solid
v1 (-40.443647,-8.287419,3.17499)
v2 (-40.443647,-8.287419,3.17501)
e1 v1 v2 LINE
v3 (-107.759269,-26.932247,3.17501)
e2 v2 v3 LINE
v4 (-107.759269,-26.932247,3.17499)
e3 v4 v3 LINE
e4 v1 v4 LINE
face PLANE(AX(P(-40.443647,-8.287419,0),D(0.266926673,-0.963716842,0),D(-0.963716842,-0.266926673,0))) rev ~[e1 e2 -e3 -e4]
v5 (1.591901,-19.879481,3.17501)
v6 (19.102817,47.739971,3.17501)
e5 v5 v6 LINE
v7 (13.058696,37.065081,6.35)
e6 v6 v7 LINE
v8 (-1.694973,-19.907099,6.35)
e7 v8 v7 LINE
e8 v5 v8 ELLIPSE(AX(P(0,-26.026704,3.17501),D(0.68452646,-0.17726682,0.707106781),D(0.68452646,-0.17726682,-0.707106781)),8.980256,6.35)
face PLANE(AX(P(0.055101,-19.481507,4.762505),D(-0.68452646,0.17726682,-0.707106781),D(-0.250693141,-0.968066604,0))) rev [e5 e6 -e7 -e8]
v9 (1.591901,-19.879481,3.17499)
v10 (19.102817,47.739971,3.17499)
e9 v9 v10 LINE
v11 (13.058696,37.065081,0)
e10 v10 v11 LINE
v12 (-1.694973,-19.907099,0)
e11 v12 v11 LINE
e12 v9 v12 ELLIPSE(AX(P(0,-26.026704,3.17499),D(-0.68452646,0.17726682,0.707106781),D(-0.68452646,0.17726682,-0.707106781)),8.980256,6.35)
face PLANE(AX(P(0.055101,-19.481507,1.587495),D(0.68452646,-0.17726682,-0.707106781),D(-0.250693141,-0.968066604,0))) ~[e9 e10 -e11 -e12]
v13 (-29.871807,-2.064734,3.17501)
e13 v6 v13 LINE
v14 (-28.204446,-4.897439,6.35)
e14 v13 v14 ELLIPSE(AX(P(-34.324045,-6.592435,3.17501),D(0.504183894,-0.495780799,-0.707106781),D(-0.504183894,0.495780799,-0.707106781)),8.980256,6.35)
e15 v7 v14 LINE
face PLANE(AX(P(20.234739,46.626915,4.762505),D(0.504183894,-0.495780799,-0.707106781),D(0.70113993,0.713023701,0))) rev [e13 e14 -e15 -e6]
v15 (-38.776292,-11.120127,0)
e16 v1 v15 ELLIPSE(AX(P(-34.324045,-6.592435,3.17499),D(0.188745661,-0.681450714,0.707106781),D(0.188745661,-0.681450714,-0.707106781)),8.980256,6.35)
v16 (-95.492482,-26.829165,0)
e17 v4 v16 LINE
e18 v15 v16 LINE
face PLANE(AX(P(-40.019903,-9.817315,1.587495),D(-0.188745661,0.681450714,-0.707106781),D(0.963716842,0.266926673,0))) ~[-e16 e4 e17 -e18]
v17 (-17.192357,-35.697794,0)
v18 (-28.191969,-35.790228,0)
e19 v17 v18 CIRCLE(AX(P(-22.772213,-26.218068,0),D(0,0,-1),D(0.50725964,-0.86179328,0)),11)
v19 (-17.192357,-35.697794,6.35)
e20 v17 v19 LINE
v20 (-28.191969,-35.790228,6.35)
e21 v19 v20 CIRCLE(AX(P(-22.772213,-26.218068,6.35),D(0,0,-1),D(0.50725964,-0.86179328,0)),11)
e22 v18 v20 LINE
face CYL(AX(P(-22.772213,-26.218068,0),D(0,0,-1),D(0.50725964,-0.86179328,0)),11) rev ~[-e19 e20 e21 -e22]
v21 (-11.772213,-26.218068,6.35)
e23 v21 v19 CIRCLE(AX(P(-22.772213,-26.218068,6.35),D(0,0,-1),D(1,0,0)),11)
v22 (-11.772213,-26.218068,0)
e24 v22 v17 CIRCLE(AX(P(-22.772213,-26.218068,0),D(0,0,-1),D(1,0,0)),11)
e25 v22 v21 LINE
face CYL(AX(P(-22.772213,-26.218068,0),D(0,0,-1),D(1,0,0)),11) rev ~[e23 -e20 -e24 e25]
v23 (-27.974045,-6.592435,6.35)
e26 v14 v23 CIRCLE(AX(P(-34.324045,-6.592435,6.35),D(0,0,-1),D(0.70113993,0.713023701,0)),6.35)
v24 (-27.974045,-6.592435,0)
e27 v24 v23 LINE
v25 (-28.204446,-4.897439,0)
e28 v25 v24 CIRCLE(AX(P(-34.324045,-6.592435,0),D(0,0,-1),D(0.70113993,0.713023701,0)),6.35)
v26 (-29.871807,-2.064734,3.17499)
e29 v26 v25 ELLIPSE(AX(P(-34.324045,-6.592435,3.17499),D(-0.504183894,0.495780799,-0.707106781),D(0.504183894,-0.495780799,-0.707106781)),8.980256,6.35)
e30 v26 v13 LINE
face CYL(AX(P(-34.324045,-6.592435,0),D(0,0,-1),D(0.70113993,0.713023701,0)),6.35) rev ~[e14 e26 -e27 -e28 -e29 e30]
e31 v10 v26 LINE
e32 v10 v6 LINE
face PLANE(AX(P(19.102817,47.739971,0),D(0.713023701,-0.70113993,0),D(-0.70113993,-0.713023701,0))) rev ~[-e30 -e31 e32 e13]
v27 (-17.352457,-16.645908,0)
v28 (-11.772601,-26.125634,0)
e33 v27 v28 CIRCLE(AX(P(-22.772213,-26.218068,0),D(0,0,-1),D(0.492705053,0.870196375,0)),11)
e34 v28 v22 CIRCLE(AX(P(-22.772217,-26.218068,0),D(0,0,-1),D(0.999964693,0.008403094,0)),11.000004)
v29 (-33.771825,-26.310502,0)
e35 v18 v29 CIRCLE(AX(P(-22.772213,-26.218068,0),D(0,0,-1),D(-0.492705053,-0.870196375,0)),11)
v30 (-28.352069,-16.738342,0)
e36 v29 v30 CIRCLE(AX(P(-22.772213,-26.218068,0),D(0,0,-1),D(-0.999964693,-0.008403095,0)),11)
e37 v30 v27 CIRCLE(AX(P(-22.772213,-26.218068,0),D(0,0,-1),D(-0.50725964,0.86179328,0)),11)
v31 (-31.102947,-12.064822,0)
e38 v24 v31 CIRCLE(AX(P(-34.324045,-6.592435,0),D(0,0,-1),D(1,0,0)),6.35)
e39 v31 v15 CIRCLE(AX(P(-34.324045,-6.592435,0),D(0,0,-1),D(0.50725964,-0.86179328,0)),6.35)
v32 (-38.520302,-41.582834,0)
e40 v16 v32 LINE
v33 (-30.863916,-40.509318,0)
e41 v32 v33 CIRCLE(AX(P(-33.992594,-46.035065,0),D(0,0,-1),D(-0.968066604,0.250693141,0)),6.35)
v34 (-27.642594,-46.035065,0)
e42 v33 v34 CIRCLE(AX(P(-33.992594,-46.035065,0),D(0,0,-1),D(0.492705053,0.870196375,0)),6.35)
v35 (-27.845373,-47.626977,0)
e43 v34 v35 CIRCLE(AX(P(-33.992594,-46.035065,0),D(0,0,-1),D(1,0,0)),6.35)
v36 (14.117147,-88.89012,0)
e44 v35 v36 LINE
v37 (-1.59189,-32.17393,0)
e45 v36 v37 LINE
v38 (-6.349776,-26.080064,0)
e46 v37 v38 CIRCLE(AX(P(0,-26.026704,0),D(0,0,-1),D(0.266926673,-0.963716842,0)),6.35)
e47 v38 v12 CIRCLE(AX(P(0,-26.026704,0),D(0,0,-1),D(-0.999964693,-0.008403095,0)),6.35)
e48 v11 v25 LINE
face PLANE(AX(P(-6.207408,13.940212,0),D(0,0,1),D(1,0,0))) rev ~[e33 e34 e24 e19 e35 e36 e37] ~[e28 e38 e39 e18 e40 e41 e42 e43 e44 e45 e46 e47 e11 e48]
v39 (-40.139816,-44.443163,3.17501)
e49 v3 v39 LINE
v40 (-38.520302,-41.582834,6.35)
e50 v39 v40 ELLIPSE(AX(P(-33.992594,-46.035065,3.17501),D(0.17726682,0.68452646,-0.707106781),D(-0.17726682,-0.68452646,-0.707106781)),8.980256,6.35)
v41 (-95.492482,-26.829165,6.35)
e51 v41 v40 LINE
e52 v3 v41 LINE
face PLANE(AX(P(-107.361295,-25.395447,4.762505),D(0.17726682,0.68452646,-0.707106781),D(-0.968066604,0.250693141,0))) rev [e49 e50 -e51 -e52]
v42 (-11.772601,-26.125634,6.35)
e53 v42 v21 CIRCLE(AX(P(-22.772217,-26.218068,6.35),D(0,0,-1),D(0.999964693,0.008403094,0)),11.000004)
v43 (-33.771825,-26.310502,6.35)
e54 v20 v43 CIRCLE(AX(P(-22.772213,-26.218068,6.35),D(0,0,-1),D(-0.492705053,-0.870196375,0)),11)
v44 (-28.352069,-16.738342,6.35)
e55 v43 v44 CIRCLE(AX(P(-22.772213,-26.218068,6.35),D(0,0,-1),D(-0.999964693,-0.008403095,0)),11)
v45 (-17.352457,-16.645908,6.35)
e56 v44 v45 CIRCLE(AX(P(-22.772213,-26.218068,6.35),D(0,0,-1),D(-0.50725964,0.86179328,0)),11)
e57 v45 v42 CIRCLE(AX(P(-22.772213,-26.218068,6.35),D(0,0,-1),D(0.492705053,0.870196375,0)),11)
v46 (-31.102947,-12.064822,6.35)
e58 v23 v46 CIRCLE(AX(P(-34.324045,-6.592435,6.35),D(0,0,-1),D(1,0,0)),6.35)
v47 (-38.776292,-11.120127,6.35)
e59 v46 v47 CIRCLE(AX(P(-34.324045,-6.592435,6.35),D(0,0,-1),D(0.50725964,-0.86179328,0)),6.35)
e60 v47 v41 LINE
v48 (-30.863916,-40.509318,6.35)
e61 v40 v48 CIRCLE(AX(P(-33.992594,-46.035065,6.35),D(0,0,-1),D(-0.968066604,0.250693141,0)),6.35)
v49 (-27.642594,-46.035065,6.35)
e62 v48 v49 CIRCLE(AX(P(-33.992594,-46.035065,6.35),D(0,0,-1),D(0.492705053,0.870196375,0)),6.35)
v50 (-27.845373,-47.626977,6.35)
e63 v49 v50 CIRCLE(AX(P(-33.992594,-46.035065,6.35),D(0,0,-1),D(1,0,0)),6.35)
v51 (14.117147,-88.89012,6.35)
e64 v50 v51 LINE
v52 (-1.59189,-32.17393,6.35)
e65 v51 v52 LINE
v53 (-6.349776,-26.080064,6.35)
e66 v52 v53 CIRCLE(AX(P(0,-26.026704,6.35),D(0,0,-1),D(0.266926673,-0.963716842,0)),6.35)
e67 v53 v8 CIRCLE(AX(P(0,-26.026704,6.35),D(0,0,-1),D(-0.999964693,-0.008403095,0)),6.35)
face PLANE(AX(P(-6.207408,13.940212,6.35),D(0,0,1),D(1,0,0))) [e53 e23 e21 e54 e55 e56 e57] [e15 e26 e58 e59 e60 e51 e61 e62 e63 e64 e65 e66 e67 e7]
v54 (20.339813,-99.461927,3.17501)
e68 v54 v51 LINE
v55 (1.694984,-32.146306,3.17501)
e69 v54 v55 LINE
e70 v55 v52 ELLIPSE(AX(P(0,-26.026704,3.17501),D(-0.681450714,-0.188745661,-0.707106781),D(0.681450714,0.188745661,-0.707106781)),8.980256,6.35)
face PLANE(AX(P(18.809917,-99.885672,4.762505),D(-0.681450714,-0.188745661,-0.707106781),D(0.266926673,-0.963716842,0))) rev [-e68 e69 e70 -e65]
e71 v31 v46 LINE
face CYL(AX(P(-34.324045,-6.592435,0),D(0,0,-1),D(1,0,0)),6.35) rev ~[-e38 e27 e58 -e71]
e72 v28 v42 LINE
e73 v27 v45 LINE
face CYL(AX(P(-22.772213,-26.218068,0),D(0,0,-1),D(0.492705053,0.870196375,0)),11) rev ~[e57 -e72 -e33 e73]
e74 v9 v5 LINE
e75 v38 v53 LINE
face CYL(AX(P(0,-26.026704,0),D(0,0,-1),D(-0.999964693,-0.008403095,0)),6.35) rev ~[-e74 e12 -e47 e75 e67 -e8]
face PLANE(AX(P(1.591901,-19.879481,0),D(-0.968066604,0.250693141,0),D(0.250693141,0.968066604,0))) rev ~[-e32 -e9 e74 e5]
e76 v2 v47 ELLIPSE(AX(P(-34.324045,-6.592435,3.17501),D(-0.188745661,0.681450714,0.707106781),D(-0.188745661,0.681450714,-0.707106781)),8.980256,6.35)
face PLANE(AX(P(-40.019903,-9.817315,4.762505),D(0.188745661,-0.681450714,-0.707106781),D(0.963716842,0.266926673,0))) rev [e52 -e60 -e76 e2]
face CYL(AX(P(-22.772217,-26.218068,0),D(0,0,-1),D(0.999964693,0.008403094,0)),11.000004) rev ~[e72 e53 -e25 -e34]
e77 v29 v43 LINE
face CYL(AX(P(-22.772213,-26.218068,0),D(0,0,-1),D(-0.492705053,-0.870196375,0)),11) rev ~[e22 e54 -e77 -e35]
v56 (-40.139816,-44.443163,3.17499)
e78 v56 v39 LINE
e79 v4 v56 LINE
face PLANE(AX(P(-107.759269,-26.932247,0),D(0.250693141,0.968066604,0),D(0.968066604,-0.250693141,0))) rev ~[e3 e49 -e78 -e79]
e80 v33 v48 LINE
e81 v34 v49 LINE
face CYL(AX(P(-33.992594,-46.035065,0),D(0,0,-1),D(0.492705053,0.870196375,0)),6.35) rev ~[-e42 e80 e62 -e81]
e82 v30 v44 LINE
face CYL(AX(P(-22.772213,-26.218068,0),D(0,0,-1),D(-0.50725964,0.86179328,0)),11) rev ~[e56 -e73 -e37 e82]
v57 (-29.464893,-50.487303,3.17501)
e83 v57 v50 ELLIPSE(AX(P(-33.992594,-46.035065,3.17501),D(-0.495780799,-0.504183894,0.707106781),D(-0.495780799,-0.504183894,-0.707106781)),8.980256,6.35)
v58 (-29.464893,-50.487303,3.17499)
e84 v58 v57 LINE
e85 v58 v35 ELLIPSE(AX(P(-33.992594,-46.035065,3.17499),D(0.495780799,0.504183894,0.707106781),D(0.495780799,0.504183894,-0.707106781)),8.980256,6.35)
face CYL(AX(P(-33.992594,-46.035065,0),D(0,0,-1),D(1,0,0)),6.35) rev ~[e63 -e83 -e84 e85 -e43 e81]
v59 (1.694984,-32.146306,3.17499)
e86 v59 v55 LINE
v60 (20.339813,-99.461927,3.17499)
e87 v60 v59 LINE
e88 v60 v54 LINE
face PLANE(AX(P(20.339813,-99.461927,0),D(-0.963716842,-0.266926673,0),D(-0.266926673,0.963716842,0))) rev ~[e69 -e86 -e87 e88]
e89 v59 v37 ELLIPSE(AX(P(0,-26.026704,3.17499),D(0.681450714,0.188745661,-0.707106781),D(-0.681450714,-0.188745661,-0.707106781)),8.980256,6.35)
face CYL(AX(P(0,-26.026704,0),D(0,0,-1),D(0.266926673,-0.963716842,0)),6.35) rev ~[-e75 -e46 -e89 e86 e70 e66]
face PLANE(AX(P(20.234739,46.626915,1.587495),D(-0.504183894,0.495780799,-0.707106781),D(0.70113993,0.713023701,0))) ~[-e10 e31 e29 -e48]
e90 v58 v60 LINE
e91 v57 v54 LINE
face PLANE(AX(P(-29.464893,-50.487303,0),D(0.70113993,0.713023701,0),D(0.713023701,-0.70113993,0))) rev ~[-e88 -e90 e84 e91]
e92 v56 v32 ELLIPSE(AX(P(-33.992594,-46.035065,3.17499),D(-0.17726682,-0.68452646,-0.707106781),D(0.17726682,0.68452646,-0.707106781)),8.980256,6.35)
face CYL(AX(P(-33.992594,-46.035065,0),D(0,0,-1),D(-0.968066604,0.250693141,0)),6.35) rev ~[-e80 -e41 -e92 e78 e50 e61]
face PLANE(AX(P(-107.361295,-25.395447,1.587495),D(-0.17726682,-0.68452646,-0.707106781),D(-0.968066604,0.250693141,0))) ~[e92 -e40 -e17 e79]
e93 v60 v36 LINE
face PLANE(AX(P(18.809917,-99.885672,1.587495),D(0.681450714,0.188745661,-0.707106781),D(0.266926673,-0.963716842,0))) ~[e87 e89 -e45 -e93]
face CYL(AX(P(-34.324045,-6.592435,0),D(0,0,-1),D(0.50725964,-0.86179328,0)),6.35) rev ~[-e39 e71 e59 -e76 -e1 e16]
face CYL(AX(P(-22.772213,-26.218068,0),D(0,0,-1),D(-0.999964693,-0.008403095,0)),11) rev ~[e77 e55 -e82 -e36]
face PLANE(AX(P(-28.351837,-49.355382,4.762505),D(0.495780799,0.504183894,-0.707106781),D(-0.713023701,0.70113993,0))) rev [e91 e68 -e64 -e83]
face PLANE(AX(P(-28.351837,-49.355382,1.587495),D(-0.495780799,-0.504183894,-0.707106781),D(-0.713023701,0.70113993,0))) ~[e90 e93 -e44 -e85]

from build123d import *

# Parameters (mm, degrees)
F1_DEPTH = 6.35
F2_SIZE  = 3.17499


# Not quite as in the source:
# - a fillet or chamfer is up to 0.001 mm smaller than in the source, because OpenCascade refuses the exact size


with BuildPart() as f1:
    # F0 (on Top) → F1 (new body)
    with BuildSketch(Plane.XY):
        with BuildLine():
            Line((-17.3524573698, -16.6459077914), (19.1028173324, 47.7399711053))
            Line((19.1028173324, 47.7399711053), (-29.8718068032, -2.0647344031))
            ThreePointArc((-29.8718068032, -2.0647344031), (-28.46767213, -4.137767395), (-27.974045361, -6.5924349039))
            ThreePointArc((-27.974045361, -6.5924349039), (-28.8114925566, -9.7443012682), (-31.1029466457, -12.0648222317))
            Line((-31.1029466457, -12.0648222317), (-28.352068997, -16.7383418336))
            ThreePointArc((-28.352068997, -16.7383418336), (-22.8646469969, -15.2184562862), (-17.3524573698, -16.6459077914))
        make_face()
        with BuildLine():
            ThreePointArc((-31.1029466457, -12.0648222317), (-36.70470147, -12.4792826589), (-40.4436473061, -8.2874192794))
            Line((-40.4436473061, -8.2874192794), (-107.7592687025, -26.9322474098))
            Line((-107.7592687025, -26.9322474098), (-33.7718245819, -26.3105019555))
            ThreePointArc((-33.7718245819, -26.3105019555), (-32.3443730767, -20.7983123285), (-28.352068997, -16.7383418336))
            Line((-28.352068997, -16.7383418336), (-31.1029466457, -12.0648222317))
        make_face()
        with BuildLine():
            Line((-33.7718245819, -26.3105019555), (-107.7592687025, -26.9322474098))
            Line((-107.7592687025, -26.9322474098), (-40.1398164365, -44.4431632978))
            ThreePointArc((-40.1398164365, -44.4431632978), (-36.4718453922, -40.1890566965), (-30.8639164155, -40.5093177627))
            Line((-30.8639164155, -40.5093177627), (-28.1919685396, -35.7902280353))
            ThreePointArc((-28.1919685396, -35.7902280353), (-32.2519390345, -31.7979239556), (-33.7718245819, -26.3105019555))
        make_face()
        with BuildLine():
            Line((20.339812506, -99.4619274356), (-17.1923569125, -35.6977939932))
            ThreePointArc((-17.1923569125, -35.6977939932), (-22.6797789126, -37.2176795405), (-28.1919685396, -35.7902280353))
            Line((-28.1919685396, -35.7902280353), (-30.8639164155, -40.5093177627))
            ThreePointArc((-30.8639164155, -40.5093177627), (-28.5067207601, -42.8369871561), (-27.6425935032, -46.0350647422))
            ThreePointArc((-27.6425935032, -46.0350647422), (-28.1158002373, -48.440433926), (-29.4648930024, -50.4873033))
            Line((-29.4648930024, -50.4873033), (20.339812506, -99.4619274356))
        make_face()
        with BuildLine():
            ThreePointArc((1.6949843755, -32.1463060392), (-3.8231655338, -31.0968032352), (-6.3497758029, -26.0800637457))
            Line((-6.3497758029, -26.0800637457), (-11.7726013276, -26.1256338712))
            ThreePointArc((-11.7726013276, -26.1256338712), (-11.7723100484, -26.1718504844), (-11.7722129547, -26.2180679134))
            ThreePointArc((-11.7722129547, -26.2180679134), (-13.2229088841, -31.6779938989), (-17.1923569125, -35.6977939932))
            Line((-17.1923569125, -35.6977939932), (20.339812506, -99.4619274356))
            Line((20.339812506, -99.4619274356), (1.6949843755, -32.1463060392))
        make_face()
        with BuildLine():
            Line((1.5919014444, -19.8794811608), (19.1028173324, 47.7399711053))
            Line((19.1028173324, 47.7399711053), (-17.3524573698, -16.6459077914))
            ThreePointArc((-17.3524573698, -16.6459077914), (-13.2924868749, -20.6382118711), (-11.7726013276, -26.1256338712))
            Line((-11.7726013276, -26.1256338712), (-6.3497758029, -26.0800637457))
            ThreePointArc((-6.3497758029, -26.0800637457), (-3.9078316495, -21.0215715485), (1.5919014444, -19.8794811608))
        make_face()
    extrude(amount=F1_DEPTH)

    # F2 (size 3.175 in the source; OpenCascade refuses exactly that, so slightly less here)
    f2_edges = [f1.edges().sort_by_distance(p)[0] for p in [
        (-74.101458, -17.609833, 6.35),
        (-73.949543, -35.687705, 6.35),
        (-73.949543, -35.687705, 0),
        (-4.56254, -74.974615, 6.35),
        (11.017398, -65.804117, 6.35),
        (-5.384495, 22.837618, 6.35),
        (-74.101458, -17.609833, 0),
        (-4.56254, -74.974615, 0),
        (11.017398, -65.804117, 0),
        (-5.384495, 22.837618, 0),
        (10.347359, 13.930245, 0),
        (10.347359, 13.930245, 6.35),
    ]]
    chamfer(f2_edges, length=F2_SIZE)


solid = f1.part
